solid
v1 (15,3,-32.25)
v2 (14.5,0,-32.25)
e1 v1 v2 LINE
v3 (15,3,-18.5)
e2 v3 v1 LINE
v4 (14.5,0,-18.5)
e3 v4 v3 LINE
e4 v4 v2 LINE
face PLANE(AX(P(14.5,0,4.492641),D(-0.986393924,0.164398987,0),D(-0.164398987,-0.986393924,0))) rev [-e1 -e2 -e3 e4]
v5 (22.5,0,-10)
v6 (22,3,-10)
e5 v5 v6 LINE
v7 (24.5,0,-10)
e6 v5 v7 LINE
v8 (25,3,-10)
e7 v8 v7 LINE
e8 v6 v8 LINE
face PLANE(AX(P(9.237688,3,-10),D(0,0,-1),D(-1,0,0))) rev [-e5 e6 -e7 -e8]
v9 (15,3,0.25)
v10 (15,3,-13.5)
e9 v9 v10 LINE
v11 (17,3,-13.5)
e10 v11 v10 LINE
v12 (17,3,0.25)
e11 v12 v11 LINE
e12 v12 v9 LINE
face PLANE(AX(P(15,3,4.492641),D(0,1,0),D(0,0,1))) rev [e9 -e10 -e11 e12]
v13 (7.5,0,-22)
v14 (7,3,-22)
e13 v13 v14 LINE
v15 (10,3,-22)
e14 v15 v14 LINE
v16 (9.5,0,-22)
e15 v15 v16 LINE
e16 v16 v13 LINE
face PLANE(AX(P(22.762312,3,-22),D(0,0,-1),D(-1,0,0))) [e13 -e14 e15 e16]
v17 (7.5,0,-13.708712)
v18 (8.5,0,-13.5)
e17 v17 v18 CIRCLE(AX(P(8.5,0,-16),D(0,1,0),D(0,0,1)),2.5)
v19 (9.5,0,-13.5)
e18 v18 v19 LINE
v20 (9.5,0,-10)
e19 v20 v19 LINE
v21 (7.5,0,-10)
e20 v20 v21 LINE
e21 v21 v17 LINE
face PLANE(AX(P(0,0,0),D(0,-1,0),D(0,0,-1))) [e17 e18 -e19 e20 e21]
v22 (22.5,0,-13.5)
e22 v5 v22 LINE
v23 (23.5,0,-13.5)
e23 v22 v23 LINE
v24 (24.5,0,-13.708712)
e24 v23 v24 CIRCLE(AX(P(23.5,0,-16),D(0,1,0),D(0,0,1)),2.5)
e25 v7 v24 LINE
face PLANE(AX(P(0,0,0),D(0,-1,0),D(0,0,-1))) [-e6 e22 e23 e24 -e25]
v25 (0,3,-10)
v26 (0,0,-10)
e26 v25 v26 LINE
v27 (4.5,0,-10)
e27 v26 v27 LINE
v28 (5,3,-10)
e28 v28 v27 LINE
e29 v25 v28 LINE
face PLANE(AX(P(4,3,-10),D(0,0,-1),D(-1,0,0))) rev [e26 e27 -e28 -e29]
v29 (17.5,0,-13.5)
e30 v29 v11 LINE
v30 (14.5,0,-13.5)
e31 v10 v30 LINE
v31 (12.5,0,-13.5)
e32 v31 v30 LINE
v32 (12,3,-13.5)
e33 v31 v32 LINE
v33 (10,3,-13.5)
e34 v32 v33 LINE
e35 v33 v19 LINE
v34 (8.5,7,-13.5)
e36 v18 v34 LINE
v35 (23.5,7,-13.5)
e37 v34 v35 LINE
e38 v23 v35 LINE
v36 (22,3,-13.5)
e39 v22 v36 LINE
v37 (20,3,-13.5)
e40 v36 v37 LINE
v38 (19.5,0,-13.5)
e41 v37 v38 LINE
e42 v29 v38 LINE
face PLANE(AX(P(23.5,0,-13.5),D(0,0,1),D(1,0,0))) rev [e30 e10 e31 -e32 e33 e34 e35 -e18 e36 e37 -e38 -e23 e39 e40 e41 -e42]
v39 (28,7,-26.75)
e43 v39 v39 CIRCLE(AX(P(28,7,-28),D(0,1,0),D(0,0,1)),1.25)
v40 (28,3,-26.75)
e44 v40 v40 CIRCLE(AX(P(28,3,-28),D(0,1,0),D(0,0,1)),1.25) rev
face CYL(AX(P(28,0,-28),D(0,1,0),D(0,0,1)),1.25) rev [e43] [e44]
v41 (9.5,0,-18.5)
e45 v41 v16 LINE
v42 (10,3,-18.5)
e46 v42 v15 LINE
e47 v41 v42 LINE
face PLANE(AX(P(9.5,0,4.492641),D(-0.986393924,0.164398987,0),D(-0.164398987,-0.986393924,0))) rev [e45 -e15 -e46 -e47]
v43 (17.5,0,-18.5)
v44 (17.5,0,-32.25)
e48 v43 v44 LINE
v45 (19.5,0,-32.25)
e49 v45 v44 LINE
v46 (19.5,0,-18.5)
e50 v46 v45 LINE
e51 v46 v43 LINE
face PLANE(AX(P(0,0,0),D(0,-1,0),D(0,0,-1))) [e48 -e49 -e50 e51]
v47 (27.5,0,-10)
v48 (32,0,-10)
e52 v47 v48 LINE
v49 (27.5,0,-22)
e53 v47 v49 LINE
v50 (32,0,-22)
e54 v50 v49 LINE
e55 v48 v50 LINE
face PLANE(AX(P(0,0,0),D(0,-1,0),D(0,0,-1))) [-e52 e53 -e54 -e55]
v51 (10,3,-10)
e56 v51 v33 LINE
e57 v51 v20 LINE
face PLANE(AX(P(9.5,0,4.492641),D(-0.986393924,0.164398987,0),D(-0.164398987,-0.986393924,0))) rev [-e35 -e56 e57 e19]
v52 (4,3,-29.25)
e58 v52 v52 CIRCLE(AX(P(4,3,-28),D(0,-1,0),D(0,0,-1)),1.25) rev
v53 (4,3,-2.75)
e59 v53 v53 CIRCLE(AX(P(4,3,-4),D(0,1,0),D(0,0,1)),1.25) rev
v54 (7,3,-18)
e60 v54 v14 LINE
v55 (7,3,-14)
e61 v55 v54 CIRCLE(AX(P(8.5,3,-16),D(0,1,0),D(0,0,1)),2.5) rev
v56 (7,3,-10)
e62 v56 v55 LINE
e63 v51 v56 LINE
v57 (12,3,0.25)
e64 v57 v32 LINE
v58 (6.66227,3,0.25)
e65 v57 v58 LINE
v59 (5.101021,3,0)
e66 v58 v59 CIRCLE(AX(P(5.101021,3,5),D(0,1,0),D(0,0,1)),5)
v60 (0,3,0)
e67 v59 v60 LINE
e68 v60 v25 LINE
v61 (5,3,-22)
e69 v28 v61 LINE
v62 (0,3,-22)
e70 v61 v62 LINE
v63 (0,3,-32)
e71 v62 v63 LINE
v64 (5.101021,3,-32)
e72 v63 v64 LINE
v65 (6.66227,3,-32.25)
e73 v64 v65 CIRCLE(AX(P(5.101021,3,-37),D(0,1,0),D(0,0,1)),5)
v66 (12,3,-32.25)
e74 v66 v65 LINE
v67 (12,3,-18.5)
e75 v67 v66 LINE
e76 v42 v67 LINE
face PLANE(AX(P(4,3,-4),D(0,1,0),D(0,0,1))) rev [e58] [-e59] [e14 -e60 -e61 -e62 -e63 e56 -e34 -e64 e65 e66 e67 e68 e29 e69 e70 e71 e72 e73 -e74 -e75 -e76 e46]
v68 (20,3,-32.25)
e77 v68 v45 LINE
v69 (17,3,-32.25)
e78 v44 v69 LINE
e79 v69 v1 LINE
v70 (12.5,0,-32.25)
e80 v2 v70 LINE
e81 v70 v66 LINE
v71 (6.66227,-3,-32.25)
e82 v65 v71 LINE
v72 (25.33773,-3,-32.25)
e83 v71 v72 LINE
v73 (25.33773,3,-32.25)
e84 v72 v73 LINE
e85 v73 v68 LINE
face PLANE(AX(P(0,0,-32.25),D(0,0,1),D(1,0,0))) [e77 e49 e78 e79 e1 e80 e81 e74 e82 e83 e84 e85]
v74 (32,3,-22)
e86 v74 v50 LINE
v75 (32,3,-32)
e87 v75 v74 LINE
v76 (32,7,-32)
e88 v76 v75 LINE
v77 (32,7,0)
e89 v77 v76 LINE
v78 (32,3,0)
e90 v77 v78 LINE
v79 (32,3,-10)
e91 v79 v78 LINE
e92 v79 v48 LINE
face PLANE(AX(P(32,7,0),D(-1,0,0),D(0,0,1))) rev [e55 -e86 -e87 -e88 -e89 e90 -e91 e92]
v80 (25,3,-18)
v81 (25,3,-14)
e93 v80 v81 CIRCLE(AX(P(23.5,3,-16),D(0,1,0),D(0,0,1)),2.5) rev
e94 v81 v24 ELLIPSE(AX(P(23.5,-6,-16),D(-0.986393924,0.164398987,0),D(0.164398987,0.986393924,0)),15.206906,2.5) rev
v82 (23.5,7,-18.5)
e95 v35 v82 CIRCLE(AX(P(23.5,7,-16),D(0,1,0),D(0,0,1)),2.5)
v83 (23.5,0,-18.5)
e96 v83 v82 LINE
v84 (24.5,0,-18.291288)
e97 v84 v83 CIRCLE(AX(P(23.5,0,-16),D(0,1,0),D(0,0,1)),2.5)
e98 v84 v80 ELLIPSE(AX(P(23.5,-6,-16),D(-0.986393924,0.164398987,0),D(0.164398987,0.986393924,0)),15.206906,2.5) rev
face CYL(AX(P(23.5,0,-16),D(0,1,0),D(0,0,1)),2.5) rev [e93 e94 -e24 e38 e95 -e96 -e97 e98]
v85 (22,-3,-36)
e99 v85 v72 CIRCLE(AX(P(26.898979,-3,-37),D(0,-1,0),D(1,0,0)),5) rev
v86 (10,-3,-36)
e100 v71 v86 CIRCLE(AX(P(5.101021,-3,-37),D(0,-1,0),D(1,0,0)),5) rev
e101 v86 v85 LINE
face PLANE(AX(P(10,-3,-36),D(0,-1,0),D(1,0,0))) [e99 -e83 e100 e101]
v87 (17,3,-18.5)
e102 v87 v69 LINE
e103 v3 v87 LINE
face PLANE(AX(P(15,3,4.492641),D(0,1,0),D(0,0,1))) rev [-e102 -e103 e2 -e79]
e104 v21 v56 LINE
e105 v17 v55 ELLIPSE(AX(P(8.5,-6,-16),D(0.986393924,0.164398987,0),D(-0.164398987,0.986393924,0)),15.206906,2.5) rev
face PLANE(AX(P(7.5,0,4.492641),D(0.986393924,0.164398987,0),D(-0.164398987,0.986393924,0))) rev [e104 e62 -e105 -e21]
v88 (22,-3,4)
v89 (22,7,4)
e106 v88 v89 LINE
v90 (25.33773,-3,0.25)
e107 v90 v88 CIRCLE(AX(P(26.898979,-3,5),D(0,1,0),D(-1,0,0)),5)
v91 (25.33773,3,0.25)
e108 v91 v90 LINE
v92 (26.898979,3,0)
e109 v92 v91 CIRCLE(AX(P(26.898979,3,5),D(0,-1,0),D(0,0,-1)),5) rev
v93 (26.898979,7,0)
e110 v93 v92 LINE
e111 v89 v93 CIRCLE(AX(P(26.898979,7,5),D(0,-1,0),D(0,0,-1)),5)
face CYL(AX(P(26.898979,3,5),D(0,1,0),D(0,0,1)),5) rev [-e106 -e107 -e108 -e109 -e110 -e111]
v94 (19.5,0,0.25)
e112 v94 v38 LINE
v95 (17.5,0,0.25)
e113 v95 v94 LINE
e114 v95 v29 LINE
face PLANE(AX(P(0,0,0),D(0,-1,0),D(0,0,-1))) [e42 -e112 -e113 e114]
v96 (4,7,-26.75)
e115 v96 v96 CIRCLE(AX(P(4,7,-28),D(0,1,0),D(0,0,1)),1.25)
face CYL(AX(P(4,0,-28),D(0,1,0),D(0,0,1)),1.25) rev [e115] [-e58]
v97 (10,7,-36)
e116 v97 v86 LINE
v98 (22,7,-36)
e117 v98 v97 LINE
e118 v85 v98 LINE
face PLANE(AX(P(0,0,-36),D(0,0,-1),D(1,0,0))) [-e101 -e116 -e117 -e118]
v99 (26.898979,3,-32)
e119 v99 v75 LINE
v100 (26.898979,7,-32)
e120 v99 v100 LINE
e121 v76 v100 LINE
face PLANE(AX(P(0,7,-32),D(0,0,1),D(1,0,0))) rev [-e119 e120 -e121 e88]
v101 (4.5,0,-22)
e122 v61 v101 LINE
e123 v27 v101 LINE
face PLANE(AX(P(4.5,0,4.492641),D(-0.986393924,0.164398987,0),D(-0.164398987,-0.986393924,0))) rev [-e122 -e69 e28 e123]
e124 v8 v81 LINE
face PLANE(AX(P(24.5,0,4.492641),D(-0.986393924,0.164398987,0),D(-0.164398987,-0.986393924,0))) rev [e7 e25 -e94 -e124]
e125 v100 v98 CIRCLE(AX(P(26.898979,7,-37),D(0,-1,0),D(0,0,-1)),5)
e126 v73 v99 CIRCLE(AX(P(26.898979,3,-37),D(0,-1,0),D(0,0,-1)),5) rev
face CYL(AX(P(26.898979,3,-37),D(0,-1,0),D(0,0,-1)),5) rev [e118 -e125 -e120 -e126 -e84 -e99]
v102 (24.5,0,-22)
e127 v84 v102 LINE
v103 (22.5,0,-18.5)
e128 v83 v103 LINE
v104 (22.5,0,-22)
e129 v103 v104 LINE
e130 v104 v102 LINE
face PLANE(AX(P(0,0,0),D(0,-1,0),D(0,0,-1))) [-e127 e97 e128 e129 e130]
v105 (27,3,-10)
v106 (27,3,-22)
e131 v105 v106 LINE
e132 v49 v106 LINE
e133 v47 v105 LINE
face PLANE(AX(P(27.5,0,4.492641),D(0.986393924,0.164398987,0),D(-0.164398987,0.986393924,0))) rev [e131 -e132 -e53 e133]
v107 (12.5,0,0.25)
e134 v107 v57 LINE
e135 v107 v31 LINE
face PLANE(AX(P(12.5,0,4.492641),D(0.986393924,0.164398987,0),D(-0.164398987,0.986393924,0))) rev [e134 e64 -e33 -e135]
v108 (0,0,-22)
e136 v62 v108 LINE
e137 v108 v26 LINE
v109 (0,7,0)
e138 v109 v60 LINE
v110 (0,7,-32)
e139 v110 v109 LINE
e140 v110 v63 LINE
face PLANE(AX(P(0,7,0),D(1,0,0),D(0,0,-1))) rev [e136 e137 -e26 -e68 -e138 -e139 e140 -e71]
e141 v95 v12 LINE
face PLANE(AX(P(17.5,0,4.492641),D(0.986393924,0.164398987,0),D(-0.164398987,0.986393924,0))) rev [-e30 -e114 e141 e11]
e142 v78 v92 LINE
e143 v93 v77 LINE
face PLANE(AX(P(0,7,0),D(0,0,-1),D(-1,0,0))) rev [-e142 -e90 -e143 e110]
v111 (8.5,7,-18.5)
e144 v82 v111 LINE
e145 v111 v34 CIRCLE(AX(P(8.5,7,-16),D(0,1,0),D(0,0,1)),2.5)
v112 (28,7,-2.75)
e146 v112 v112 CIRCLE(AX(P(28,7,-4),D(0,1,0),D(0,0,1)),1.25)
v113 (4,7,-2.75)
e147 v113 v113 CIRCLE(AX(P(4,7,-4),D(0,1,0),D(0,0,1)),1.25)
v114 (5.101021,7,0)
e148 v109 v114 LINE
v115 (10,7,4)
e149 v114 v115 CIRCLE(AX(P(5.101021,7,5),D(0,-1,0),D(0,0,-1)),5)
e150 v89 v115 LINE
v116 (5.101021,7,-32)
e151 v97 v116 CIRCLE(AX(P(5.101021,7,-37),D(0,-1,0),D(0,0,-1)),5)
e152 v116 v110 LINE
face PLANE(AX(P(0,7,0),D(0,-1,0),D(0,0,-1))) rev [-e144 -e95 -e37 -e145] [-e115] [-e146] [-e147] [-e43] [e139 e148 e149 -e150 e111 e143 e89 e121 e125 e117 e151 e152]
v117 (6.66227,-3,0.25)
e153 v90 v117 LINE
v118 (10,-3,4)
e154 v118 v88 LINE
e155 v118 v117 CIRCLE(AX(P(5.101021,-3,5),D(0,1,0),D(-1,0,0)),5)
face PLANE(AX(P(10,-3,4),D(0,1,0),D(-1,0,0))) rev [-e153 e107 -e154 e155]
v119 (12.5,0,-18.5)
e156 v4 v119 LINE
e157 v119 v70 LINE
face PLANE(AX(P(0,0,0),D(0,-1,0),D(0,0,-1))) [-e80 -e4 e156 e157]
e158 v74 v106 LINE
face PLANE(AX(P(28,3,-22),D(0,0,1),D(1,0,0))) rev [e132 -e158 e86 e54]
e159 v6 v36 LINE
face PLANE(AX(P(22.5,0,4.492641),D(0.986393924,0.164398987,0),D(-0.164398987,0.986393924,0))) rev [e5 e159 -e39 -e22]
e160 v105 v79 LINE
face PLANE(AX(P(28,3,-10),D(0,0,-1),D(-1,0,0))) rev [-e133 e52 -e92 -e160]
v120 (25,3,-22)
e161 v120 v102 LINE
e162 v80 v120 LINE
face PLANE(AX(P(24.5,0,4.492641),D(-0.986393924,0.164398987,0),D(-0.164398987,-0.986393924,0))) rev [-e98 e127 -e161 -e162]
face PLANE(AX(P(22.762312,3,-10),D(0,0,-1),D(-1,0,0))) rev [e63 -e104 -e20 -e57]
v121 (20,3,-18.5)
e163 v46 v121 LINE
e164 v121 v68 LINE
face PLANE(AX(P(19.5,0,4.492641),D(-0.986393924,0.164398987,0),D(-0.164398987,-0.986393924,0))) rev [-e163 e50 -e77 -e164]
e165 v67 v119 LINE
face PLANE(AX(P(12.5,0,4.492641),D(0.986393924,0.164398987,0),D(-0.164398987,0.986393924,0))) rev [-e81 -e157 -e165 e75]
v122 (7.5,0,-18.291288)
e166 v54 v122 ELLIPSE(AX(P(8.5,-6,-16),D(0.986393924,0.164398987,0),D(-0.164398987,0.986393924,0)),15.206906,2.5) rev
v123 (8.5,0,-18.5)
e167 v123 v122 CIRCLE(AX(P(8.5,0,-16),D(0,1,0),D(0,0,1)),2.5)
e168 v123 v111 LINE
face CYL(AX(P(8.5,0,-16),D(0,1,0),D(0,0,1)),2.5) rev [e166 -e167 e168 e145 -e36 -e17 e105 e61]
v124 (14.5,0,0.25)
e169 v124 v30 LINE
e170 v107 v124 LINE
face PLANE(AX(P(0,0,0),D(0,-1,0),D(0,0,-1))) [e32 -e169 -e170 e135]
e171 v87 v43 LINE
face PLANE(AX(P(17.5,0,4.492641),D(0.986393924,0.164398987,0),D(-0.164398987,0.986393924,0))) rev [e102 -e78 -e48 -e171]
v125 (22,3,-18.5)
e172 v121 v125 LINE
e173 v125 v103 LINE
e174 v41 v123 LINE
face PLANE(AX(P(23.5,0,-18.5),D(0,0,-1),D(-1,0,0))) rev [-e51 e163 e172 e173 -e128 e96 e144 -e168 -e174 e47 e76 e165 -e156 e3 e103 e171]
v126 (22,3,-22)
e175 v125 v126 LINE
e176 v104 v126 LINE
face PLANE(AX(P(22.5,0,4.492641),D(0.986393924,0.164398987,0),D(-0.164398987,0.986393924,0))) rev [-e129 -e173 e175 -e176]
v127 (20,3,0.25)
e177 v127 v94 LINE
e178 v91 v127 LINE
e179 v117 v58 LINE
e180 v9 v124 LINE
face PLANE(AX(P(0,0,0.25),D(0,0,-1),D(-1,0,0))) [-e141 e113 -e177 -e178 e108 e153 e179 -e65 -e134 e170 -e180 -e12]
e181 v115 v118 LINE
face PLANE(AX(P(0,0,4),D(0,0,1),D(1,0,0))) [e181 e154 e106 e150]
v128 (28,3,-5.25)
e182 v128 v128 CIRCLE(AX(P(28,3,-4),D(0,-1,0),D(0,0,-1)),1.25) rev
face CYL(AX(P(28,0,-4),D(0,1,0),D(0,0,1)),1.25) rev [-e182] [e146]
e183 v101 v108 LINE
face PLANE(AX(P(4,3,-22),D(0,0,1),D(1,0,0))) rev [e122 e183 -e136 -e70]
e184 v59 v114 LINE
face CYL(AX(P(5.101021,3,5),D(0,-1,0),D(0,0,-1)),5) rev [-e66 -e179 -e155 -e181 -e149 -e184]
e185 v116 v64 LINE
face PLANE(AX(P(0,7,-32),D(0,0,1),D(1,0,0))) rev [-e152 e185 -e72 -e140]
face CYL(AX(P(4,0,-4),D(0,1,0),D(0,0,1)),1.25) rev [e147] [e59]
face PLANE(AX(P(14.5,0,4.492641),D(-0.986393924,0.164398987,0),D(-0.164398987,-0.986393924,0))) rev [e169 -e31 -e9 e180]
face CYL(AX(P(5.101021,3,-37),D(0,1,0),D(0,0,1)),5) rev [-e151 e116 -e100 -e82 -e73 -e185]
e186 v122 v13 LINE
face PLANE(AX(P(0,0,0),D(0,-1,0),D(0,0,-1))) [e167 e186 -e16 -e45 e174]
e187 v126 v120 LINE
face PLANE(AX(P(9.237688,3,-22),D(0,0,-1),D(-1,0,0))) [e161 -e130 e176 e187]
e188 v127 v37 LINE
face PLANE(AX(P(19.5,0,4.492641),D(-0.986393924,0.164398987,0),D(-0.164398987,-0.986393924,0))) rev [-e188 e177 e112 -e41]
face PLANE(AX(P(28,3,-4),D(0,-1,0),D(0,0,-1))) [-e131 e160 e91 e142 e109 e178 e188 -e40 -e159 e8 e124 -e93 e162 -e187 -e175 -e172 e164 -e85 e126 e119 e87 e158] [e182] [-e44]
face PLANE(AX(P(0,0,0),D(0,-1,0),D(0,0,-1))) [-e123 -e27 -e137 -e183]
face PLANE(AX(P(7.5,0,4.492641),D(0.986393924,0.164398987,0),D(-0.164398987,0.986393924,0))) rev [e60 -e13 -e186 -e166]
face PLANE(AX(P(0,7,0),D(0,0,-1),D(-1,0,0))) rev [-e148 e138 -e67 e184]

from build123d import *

# Parameters (mm, degrees)
SKETCH_1_W                      = 32
SKETCH_1_H                      = 32
EXTRUDE_1_DEPTH                 = 7
SKETCH_3_R                      = 1.25
CUT_EXTRUDE_1_DEPTH             = 46.793012567
CUT_EXTRUDE_2_DEPTH             = 3
CUT_EXTRUDE_3_DEPTH             = 46.793012567
SKETCH_6_W                      = 12
SKETCH_6_H                      = 10
EXTRUDE_2_DEPTH                 = 4
SKETCH_11_W                     = 12
SKETCH_11_H                     = 3
CUT_EXTRUDE_5_DEPTH             = 0.25
SKETCH_12_W                     = 12
SKETCH_12_H                     = 3
CUT_EXTRUDE_6_DEPTH             = 0.25
CUT_EXTRUDE_7_REACH             = 40.38
CUT_EXTRUDE_7_DIRECTION_2_REACH = 40.38
FILLET_1_R                      = 5
FILLET_2_R                      = 5
CUT_EXTRUDE_8_REACH             = 50.672
SKETCH_13_W                     = 10
SKETCH_13_H                     = 3
CUT_EXTRUDE_9_REACH             = 50.672
SKETCH_14_W                     = 10
SKETCH_14_H                     = 3


with BuildPart() as part:
    # Эскиз1 → Бобышка-Вытянуть1 (new body)
    with BuildSketch(Plane(origin=(0, 0, 0), x_dir=(1, 0, 0), z_dir=(0, 1, 0))):
        with Locations((16, 16)):
            Rectangle(SKETCH_1_W, SKETCH_1_H)
    extrude(amount=EXTRUDE_1_DEPTH)

    # Эскиз3 → Вырез-Вытянуть1 (cut, through all)
    with BuildSketch(Plane(origin=(0, 7, 0), x_dir=(1, 0, 0), z_dir=(0, 1, 0))):
        with Locations(Location((4, 28, 0), (0, 0, 270))):
            Circle(SKETCH_3_R)
        with Locations(Location((28, 28, 0), (0, 0, 270))):
            Circle(SKETCH_3_R)
        with Locations(Location((4, 4, 0), (0, 0, 270))):
            Circle(SKETCH_3_R)
        with Locations(Location((28, 4, 0), (0, 0, 270))):
            Circle(SKETCH_3_R)
    extrude(amount=-CUT_EXTRUDE_1_DEPTH, mode=Mode.SUBTRACT)

    # Эскиз4 → Вырез-Вытянуть2 (cut)
    with BuildSketch(Plane.XZ):
        with BuildLine():
            Line((28, -10), (32, -10))
            Line((32, -10), (32, 0))
            Line((32, 0), (22, 0))
            Line((22, 0), (22, -4))
            ThreePointArc((22, -4), (23.757359313, -8.242640687), (28, -10))
        make_face()
        with BuildLine():
            Line((4, -10), (0, -10))
            Line((0, -10), (0, 0))
            Line((0, 0), (10, 0))
            Line((10, 0), (10, -4))
            ThreePointArc((10, -4), (8.242640687, -8.242640687), (4, -10))
        make_face()
        with BuildLine():
            Line((22, -32), (32, -32))
            Line((32, -32), (32, -22))
            Line((32, -22), (28, -22))
            ThreePointArc((28, -22), (23.757359313, -23.757359313), (22, -28))
            Line((22, -28), (22, -32))
        make_face()
        with BuildLine():
            Line((10, -32), (0, -32))
            Line((0, -32), (0, -22))
            Line((0, -22), (4, -22))
            ThreePointArc((4, -22), (8.242640687, -23.757359313), (10, -28))
            Line((10, -28), (10, -32))
        make_face()
    extrude(amount=-CUT_EXTRUDE_2_DEPTH, mode=Mode.SUBTRACT)

    # Эскиз5 → Вырез-Вытянуть3 (cut, through all)
    with BuildSketch(Plane(origin=(0, 7, 0), x_dir=(1, 0, 0), z_dir=(0, 1, 0))):
        with BuildLine():
            Line((23.5, 18.5), (8.5, 18.5))
            ThreePointArc((8.5, 18.5), (6, 16), (8.5, 13.5))
            Line((8.5, 13.5), (23.5, 13.5))
            ThreePointArc((23.5, 13.5), (26, 16), (23.5, 18.5))
        make_face()
    extrude(amount=-CUT_EXTRUDE_3_DEPTH, mode=Mode.SUBTRACT)

    # Эскиз6 → Бобышка-Вытянуть2 (add)
    with BuildSketch(Plane.XY):
        with Locations((16, 2)):
            Rectangle(SKETCH_6_W, SKETCH_6_H)
    extrude_2 = extrude(amount=EXTRUDE_2_DEPTH)

    # Зеркальное отражение1: Бобышка-Вытянуть2 across plane
    add(extrude_2.mirror(Plane(origin=(0, 0, -16), x_dir=(1, 0, 0), z_dir=(0, 0, -1))))

    # Эскиз11 → Вырез-Вытянуть5 (cut)
    with BuildSketch(Plane(origin=(0, 0, 0), x_dir=(-1, 0, 0), z_dir=(0, 0, -1))):
        with Locations((-16, -1.5)):
            Rectangle(SKETCH_11_W, SKETCH_11_H)
    extrude(amount=-CUT_EXTRUDE_5_DEPTH, mode=Mode.SUBTRACT)

    # Эскиз12 → Вырез-Вытянуть6 (cut)
    with BuildSketch(Plane.XY.offset(-32)):
        with Locations((16, -1.5)):
            Rectangle(SKETCH_12_W, SKETCH_12_H)
    extrude(amount=-CUT_EXTRUDE_6_DEPTH, mode=Mode.SUBTRACT)

    # Вырез-Вытянуть7: up to this face of the body (flat: up to its plane)
    cut_extrude_7_end = Plane(part.part.faces().sort_by_distance((16, -1.5, 0.25))[0])
    # Эскиз10 → Вырез-Вытянуть7 (cut, up to the picked face)
    with BuildSketch(Plane(origin=(0, 0, -16), x_dir=(-1, 0, 0), z_dir=(0, 0, -1)), mode=Mode.PRIVATE) as cut_extrude_7_sk1:
        Polygon((-14.5, 0), (-15, 3), (-17, 3), (-17.5, 0), align=None)
    cut_extrude_7_tool1 = split(extrude(cut_extrude_7_sk1.sketch, amount=-CUT_EXTRUDE_7_REACH, mode=Mode.PRIVATE), bisect_by=cut_extrude_7_end, keep=Keep.BOTH, mode=Mode.PRIVATE)
    # Эскиз10 → Вырез-Вытянуть7 (cut, up to the picked face)
    with BuildSketch(Plane(origin=(0, 0, -16), x_dir=(-1, 0, 0), z_dir=(0, 0, -1)), mode=Mode.PRIVATE) as cut_extrude_7_sk2:
        Polygon((-9.5, 0), (-10, 3), (-12, 3), (-12.5, 0), align=None)
    cut_extrude_7_tool2 = split(extrude(cut_extrude_7_sk2.sketch, amount=-CUT_EXTRUDE_7_REACH, mode=Mode.PRIVATE), bisect_by=cut_extrude_7_end, keep=Keep.BOTH, mode=Mode.PRIVATE)
    # Эскиз10 → Вырез-Вытянуть7 (cut, up to the picked face)
    with BuildSketch(Plane(origin=(0, 0, -16), x_dir=(-1, 0, 0), z_dir=(0, 0, -1)), mode=Mode.PRIVATE) as cut_extrude_7_sk3:
        Polygon((-4.5, 0), (-5, 3), (-7, 3), (-7.5, 0), align=None)
    cut_extrude_7_tool3 = split(extrude(cut_extrude_7_sk3.sketch, amount=-CUT_EXTRUDE_7_REACH, mode=Mode.PRIVATE), bisect_by=cut_extrude_7_end, keep=Keep.BOTH, mode=Mode.PRIVATE)
    # Эскиз10 → Вырез-Вытянуть7 (cut, up to the picked face)
    with BuildSketch(Plane(origin=(0, 0, -16), x_dir=(-1, 0, 0), z_dir=(0, 0, -1)), mode=Mode.PRIVATE) as cut_extrude_7_sk4:
        Polygon((-22.5, 0), (-22, 3), (-20, 3), (-19.5, 0), align=None)
    cut_extrude_7_tool4 = split(extrude(cut_extrude_7_sk4.sketch, amount=-CUT_EXTRUDE_7_REACH, mode=Mode.PRIVATE), bisect_by=cut_extrude_7_end, keep=Keep.BOTH, mode=Mode.PRIVATE)
    # Эскиз10 → Вырез-Вытянуть7 (cut, up to the picked face)
    with BuildSketch(Plane(origin=(0, 0, -16), x_dir=(-1, 0, 0), z_dir=(0, 0, -1)), mode=Mode.PRIVATE) as cut_extrude_7_sk5:
        Polygon((-27.5, 0), (-27, 3), (-25, 3), (-24.5, 0), align=None)
    cut_extrude_7_tool5 = split(extrude(cut_extrude_7_sk5.sketch, amount=-CUT_EXTRUDE_7_REACH, mode=Mode.PRIVATE), bisect_by=cut_extrude_7_end, keep=Keep.BOTH, mode=Mode.PRIVATE)
    add(cut_extrude_7_tool1.solids().sort_by(Axis((16, 1.4, -16), (0, 0, 1)))[0], mode=Mode.SUBTRACT)
    add(cut_extrude_7_tool2.solids().sort_by(Axis((11, 1.4, -16), (0, 0, 1)))[0], mode=Mode.SUBTRACT)
    add(cut_extrude_7_tool3.solids().sort_by(Axis((6, 1.4, -16), (0, 0, 1)))[0], mode=Mode.SUBTRACT)
    add(cut_extrude_7_tool4.solids().sort_by(Axis((21, 1.4, -16), (0, 0, 1)))[0], mode=Mode.SUBTRACT)
    add(cut_extrude_7_tool5.solids().sort_by(Axis((26, 1.4, -16), (0, 0, 1)))[0], mode=Mode.SUBTRACT)

    # Вырез-Вытянуть7 direction 2: up to this face of the body (flat: up to its plane)
    cut_extrude_7_direction_2_end = Plane(part.part.faces().sort_by_distance((16, -1.5, -32.25))[0])
    # Эскиз10 → Вырез-Вытянуть7 direction 2 (cut, up to the picked face)
    with BuildSketch(Plane(origin=(0, 0, -16), x_dir=(-1, 0, 0), z_dir=(0, 0, -1)), mode=Mode.PRIVATE) as cut_extrude_7_direction_2_sk1:
        Polygon((-14.5, 0), (-15, 3), (-17, 3), (-17.5, 0), align=None)
    cut_extrude_7_direction_2_tool1 = split(extrude(cut_extrude_7_direction_2_sk1.sketch, amount=CUT_EXTRUDE_7_DIRECTION_2_REACH, mode=Mode.PRIVATE), bisect_by=cut_extrude_7_direction_2_end, keep=Keep.BOTH, mode=Mode.PRIVATE)
    # Эскиз10 → Вырез-Вытянуть7 direction 2 (cut, up to the picked face)
    with BuildSketch(Plane(origin=(0, 0, -16), x_dir=(-1, 0, 0), z_dir=(0, 0, -1)), mode=Mode.PRIVATE) as cut_extrude_7_direction_2_sk2:
        Polygon((-9.5, 0), (-10, 3), (-12, 3), (-12.5, 0), align=None)
    cut_extrude_7_direction_2_tool2 = split(extrude(cut_extrude_7_direction_2_sk2.sketch, amount=CUT_EXTRUDE_7_DIRECTION_2_REACH, mode=Mode.PRIVATE), bisect_by=cut_extrude_7_direction_2_end, keep=Keep.BOTH, mode=Mode.PRIVATE)
    # Эскиз10 → Вырез-Вытянуть7 direction 2 (cut, up to the picked face)
    with BuildSketch(Plane(origin=(0, 0, -16), x_dir=(-1, 0, 0), z_dir=(0, 0, -1)), mode=Mode.PRIVATE) as cut_extrude_7_direction_2_sk3:
        Polygon((-4.5, 0), (-5, 3), (-7, 3), (-7.5, 0), align=None)
    cut_extrude_7_direction_2_tool3 = split(extrude(cut_extrude_7_direction_2_sk3.sketch, amount=CUT_EXTRUDE_7_DIRECTION_2_REACH, mode=Mode.PRIVATE), bisect_by=cut_extrude_7_direction_2_end, keep=Keep.BOTH, mode=Mode.PRIVATE)
    # Эскиз10 → Вырез-Вытянуть7 direction 2 (cut, up to the picked face)
    with BuildSketch(Plane(origin=(0, 0, -16), x_dir=(-1, 0, 0), z_dir=(0, 0, -1)), mode=Mode.PRIVATE) as cut_extrude_7_direction_2_sk4:
        Polygon((-22.5, 0), (-22, 3), (-20, 3), (-19.5, 0), align=None)
    cut_extrude_7_direction_2_tool4 = split(extrude(cut_extrude_7_direction_2_sk4.sketch, amount=CUT_EXTRUDE_7_DIRECTION_2_REACH, mode=Mode.PRIVATE), bisect_by=cut_extrude_7_direction_2_end, keep=Keep.BOTH, mode=Mode.PRIVATE)
    # Эскиз10 → Вырез-Вытянуть7 direction 2 (cut, up to the picked face)
    with BuildSketch(Plane(origin=(0, 0, -16), x_dir=(-1, 0, 0), z_dir=(0, 0, -1)), mode=Mode.PRIVATE) as cut_extrude_7_direction_2_sk5:
        Polygon((-27.5, 0), (-27, 3), (-25, 3), (-24.5, 0), align=None)
    cut_extrude_7_direction_2_tool5 = split(extrude(cut_extrude_7_direction_2_sk5.sketch, amount=CUT_EXTRUDE_7_DIRECTION_2_REACH, mode=Mode.PRIVATE), bisect_by=cut_extrude_7_direction_2_end, keep=Keep.BOTH, mode=Mode.PRIVATE)
    add(cut_extrude_7_direction_2_tool1.solids().sort_by(Axis((16, 1.4, -16), (0, 0, -1)))[0], mode=Mode.SUBTRACT)
    add(cut_extrude_7_direction_2_tool2.solids().sort_by(Axis((11, 1.4, -16), (0, 0, -1)))[0], mode=Mode.SUBTRACT)
    add(cut_extrude_7_direction_2_tool3.solids().sort_by(Axis((6, 1.4, -16), (0, 0, -1)))[0], mode=Mode.SUBTRACT)
    add(cut_extrude_7_direction_2_tool4.solids().sort_by(Axis((21, 1.4, -16), (0, 0, -1)))[0], mode=Mode.SUBTRACT)
    add(cut_extrude_7_direction_2_tool5.solids().sort_by(Axis((26, 1.4, -16), (0, 0, -1)))[0], mode=Mode.SUBTRACT)

    # Скругление1
    # the kernel refuses this fillet: 5 mm, written as the material it adds along each edge
    with BuildSketch(Plane(origin=(10, -9.247448714, 0), x_dir=(-1, 0, 0), z_dir=(0, 1, 0))) as fillet_1_piece_1_section:
        with BuildLine():
            CenterArc((4.898979486, 5), FILLET_1_R, 191.536959033, 78.463040967)
            Line((0, 4), (-0.09797959, 3.98))
            ThreePointArc((-0.09797959, 3.98), (-0.1, 2), (-0.1, 0))
            Line((-0.1, 0), (0, -0.1))
            Line((0, -0.1), (4.898979486, -0.1))
            Line((4.898979486, -0.1), (4.898979486, 0))
        make_face()
    fillet_1_piece_1 = extrude(amount=16.247448714, mode=Mode.PRIVATE)
    fillet_1_piece_1 = split(fillet_1_piece_1, bisect_by=Plane(origin=(9.174108799, 3, 1.317726135), z_dir=(0, -1, 0)), keep=Keep.TOP, mode=Mode.PRIVATE)
    fillet_1_piece_1 = split(fillet_1_piece_1, bisect_by=Plane(origin=(9.174108799, 0, 0.25), z_dir=(0, 0, 1)), keep=Keep.TOP, mode=Mode.PRIVATE)
    fillet_1_piece_1 = split(fillet_1_piece_1, bisect_by=Plane(origin=(9.174108799, -3, 1.317726135), z_dir=(0, 1, 0)), keep=Keep.TOP, mode=Mode.PRIVATE)
    add(fillet_1_piece_1)
    with BuildSketch(Plane(origin=(10, 3, 0), x_dir=(-1, 0, 0), z_dir=(0, 1, 0))) as fillet_1_piece_2_section:
        with BuildLine():
            CenterArc((4.898979486, 5), FILLET_1_R, 191.536959033, 78.463040967)
            Line((0, 4), (-0.09797959, 3.98))
            ThreePointArc((-0.09797959, 3.98), (-0.1, 2), (-0.1, 0))
            Line((-0.1, 0), (0, -0.1))
            Line((0, -0.1), (4.898979486, -0.1))
            Line((4.898979486, -0.1), (4.898979486, 0))
        make_face()
    fillet_1_piece_2 = extrude(amount=4, mode=Mode.PRIVATE)
    fillet_1_piece_2 = split(fillet_1_piece_2, bisect_by=Plane(origin=(7.929392112, 5, 0.25), z_dir=(0, 0, -1)), keep=Keep.TOP, mode=Mode.PRIVATE)
    add(fillet_1_piece_2)
    with BuildSketch(Plane(origin=(10, 3, 0), x_dir=(-1, 0, 0), z_dir=(0, 1, 0))) as fillet_1_piece_3_section:
        with BuildLine():
            CenterArc((4.898979486, 5), FILLET_1_R, 191.536959033, 78.463040967)
            Line((0, 4), (-0.09797959, 3.98))
            ThreePointArc((-0.09797959, 3.98), (-0.1, 2), (-0.1, 0))
            Line((-0.1, 0), (0, -0.1))
            Line((0, -0.1), (4.898979486, -0.1))
            Line((4.898979486, -0.1), (4.898979486, 0))
        make_face()
    fillet_1_piece_3 = extrude(amount=4, mode=Mode.PRIVATE)
    fillet_1_piece_3 = split(fillet_1_piece_3, bisect_by=Plane(origin=(9.174108799, 5, 0.25), z_dir=(0, 0, 1)), keep=Keep.TOP, mode=Mode.PRIVATE)
    add(fillet_1_piece_3)

    # Скругление2
    # the kernel refuses this fillet: 5 mm, written as the material it adds along each edge
    with BuildSketch(Plane(origin=(10, -9.247448714, -32), x_dir=(-1.5738521597081158e-12, 0, -1.0), z_dir=(0, 1, 0))) as fillet_2_piece_1_section:
        with BuildLine():
            CenterArc((5, 4.898979486), FILLET_2_R, 180, 78.463040967)
            Line((0, 4.898979486), (-0.1, 4.898979486))
            Line((-0.1, 4.898979486), (-0.1, 0))
            Line((-0.1, 0), (0, -0.1))
            ThreePointArc((0, -0.1), (2, -0.1), (3.98, -0.09797959))
            Line((3.98, -0.09797959), (4, 0))
        make_face()
    fillet_2_piece_1 = extrude(amount=16.247448714, mode=Mode.PRIVATE)
    fillet_2_piece_1 = split(fillet_2_piece_1, bisect_by=Plane(origin=(9.174108799, 0, -32.25), z_dir=(0, 0, -1)), keep=Keep.TOP, mode=Mode.PRIVATE)
    fillet_2_piece_1 = split(fillet_2_piece_1, bisect_by=Plane(origin=(9.174108799, 3, -33.317726135), z_dir=(0, -1, 0)), keep=Keep.TOP, mode=Mode.PRIVATE)
    fillet_2_piece_1 = split(fillet_2_piece_1, bisect_by=Plane(origin=(9.174108799, -3, -33.317726135), z_dir=(0, 1, 0)), keep=Keep.TOP, mode=Mode.PRIVATE)
    add(fillet_2_piece_1)
    with BuildSketch(Plane(origin=(10, 3, -32), x_dir=(-1.5720758028687162e-12, 0, -1.0), z_dir=(0, 1, 0))) as fillet_2_piece_2_section:
        with BuildLine():
            CenterArc((5, 4.898979486), FILLET_2_R, 180, 78.463040967)
            Line((0, 4.898979486), (-0.1, 4.898979486))
            Line((-0.1, 4.898979486), (-0.1, 0))
            Line((-0.1, 0), (0, -0.1))
            ThreePointArc((0, -0.1), (2, -0.1), (3.98, -0.09797959))
            Line((3.98, -0.09797959), (4, 0))
        make_face()
    fillet_2_piece_2 = extrude(amount=4, mode=Mode.PRIVATE)
    fillet_2_piece_2 = split(fillet_2_piece_2, bisect_by=Plane(origin=(9.174108799, 5, -32.25), z_dir=(0, 0, -1)), keep=Keep.TOP, mode=Mode.PRIVATE)
    add(fillet_2_piece_2)
    with BuildSketch(Plane(origin=(10, 3, -32), x_dir=(-1.5720758028687162e-12, 0, -1.0), z_dir=(0, 1, 0))) as fillet_2_piece_3_section:
        with BuildLine():
            CenterArc((5, 4.898979486), FILLET_2_R, 180, 78.463040967)
            Line((0, 4.898979486), (-0.1, 4.898979486))
            Line((-0.1, 4.898979486), (-0.1, 0))
            Line((-0.1, 0), (0, -0.1))
            ThreePointArc((0, -0.1), (2, -0.1), (3.98, -0.09797959))
            Line((3.98, -0.09797959), (4, 0))
        make_face()
    fillet_2_piece_3 = extrude(amount=4, mode=Mode.PRIVATE)
    fillet_2_piece_3 = split(fillet_2_piece_3, bisect_by=Plane(origin=(7.929392112, 5, -32.25), z_dir=(0, 0, 1)), keep=Keep.TOP, mode=Mode.PRIVATE)
    add(fillet_2_piece_3)
    with BuildSketch(Plane(origin=(22, 7, -32), x_dir=(1, 0, 0), z_dir=(0, -1, 0))) as fillet_2_piece_4_section:
        with BuildLine():
            CenterArc((4.898979486, -5), FILLET_2_R, 90, 78.463040967)
            Line((0, -4), (-0.09797959, -3.98))
            ThreePointArc((-0.09797959, -3.98), (-0.1, -2), (-0.1, 0))
            Line((-0.1, 0), (0, 0.1))
            Line((0, 0.1), (4.898979486, 0.1))
            Line((4.898979486, 0.1), (4.898979486, 0))
        make_face()
    fillet_2_piece_4 = extrude(amount=4, mode=Mode.PRIVATE)
    fillet_2_piece_4 = split(fillet_2_piece_4, bisect_by=Plane(origin=(24.070607888, 5, -32.25), z_dir=(0, 0, 1)), keep=Keep.TOP, mode=Mode.PRIVATE)
    add(fillet_2_piece_4)
    with BuildSketch(Plane(origin=(22, 7, -32), x_dir=(1, 0, 0), z_dir=(0, -1, 0))) as fillet_2_piece_5_section:
        with BuildLine():
            CenterArc((4.898979486, -5), FILLET_2_R, 90, 78.463040967)
            Line((0, -4), (-0.09797959, -3.98))
            ThreePointArc((-0.09797959, -3.98), (-0.1, -2), (-0.1, 0))
            Line((-0.1, 0), (0, 0.1))
            Line((0, 0.1), (4.898979486, 0.1))
            Line((4.898979486, 0.1), (4.898979486, 0))
        make_face()
    fillet_2_piece_5 = extrude(amount=4, mode=Mode.PRIVATE)
    fillet_2_piece_5 = split(fillet_2_piece_5, bisect_by=Plane(origin=(22.825891201, 5, -32.25), z_dir=(0, 0, -1)), keep=Keep.TOP, mode=Mode.PRIVATE)
    add(fillet_2_piece_5)
    with BuildSketch(Plane(origin=(22, 7, -32), x_dir=(1, 0, 0), z_dir=(0, -1, 0))) as fillet_2_piece_6_section:
        with BuildLine():
            CenterArc((4.898979486, -5), FILLET_2_R, 90, 78.463040967)
            Line((0, -4), (-0.09797959, -3.98))
            ThreePointArc((-0.09797959, -3.98), (-0.1, -2), (-0.1, 0))
            Line((-0.1, 0), (0, 0.1))
            Line((0, 0.1), (4.898979486, 0.1))
            Line((4.898979486, 0.1), (4.898979486, 0))
        make_face()
    fillet_2_piece_6 = extrude(amount=16.247448714, mode=Mode.PRIVATE)
    fillet_2_piece_6 = split(fillet_2_piece_6, bisect_by=Plane(origin=(22.825891201, 3, -33.317726135), z_dir=(0, -1, 0)), keep=Keep.TOP, mode=Mode.PRIVATE)
    fillet_2_piece_6 = split(fillet_2_piece_6, bisect_by=Plane(origin=(22.825891201, -3, -33.317726135), z_dir=(0, 1, 0)), keep=Keep.TOP, mode=Mode.PRIVATE)
    fillet_2_piece_6 = split(fillet_2_piece_6, bisect_by=Plane(origin=(22.825891201, 0, -32.25), z_dir=(0, 0, -1)), keep=Keep.TOP, mode=Mode.PRIVATE)
    add(fillet_2_piece_6)
    with BuildSketch(Plane(origin=(22, 7, 0), x_dir=(1.572075802868717e-12, 0, 1.0), z_dir=(0, -1, 0))) as fillet_2_piece_7_section:
        with BuildLine():
            CenterArc((5, -4.898979486), FILLET_2_R, 101.536959033, 78.463040967)
            Line((0, -4.898979486), (-0.1, -4.898979486))
            Line((-0.1, -4.898979486), (-0.1, 0))
            Line((-0.1, 0), (0, 0.1))
            ThreePointArc((0, 0.1), (2, 0.1), (3.98, 0.09797959))
            Line((3.98, 0.09797959), (4, 0))
        make_face()
    fillet_2_piece_7 = extrude(amount=4, mode=Mode.PRIVATE)
    fillet_2_piece_7 = split(fillet_2_piece_7, bisect_by=Plane(origin=(22.825891201, 5, 0.25), z_dir=(0, 0, 1)), keep=Keep.TOP, mode=Mode.PRIVATE)
    add(fillet_2_piece_7)
    with BuildSketch(Plane(origin=(22, 7, 0), x_dir=(1.572075802868717e-12, 0, 1.0), z_dir=(0, -1, 0))) as fillet_2_piece_8_section:
        with BuildLine():
            CenterArc((5, -4.898979486), FILLET_2_R, 101.536959033, 78.463040967)
            Line((0, -4.898979486), (-0.1, -4.898979486))
            Line((-0.1, -4.898979486), (-0.1, 0))
            Line((-0.1, 0), (0, 0.1))
            ThreePointArc((0, 0.1), (2, 0.1), (3.98, 0.09797959))
            Line((3.98, 0.09797959), (4, 0))
        make_face()
    fillet_2_piece_8 = extrude(amount=4, mode=Mode.PRIVATE)
    fillet_2_piece_8 = split(fillet_2_piece_8, bisect_by=Plane(origin=(24.070607888, 5, 0.25), z_dir=(0, 0, -1)), keep=Keep.TOP, mode=Mode.PRIVATE)
    add(fillet_2_piece_8)
    with BuildSketch(Plane(origin=(22, 7, 0), x_dir=(1.572075802868717e-12, 0, 1.0), z_dir=(0, -1, 0))) as fillet_2_piece_9_section:
        with BuildLine():
            CenterArc((5, -4.898979486), FILLET_2_R, 101.536959033, 78.463040967)
            Line((0, -4.898979486), (-0.1, -4.898979486))
            Line((-0.1, -4.898979486), (-0.1, 0))
            Line((-0.1, 0), (0, 0.1))
            ThreePointArc((0, 0.1), (2, 0.1), (3.98, 0.09797959))
            Line((3.98, 0.09797959), (4, 0))
        make_face()
    fillet_2_piece_9 = extrude(amount=16.247448714, mode=Mode.PRIVATE)
    fillet_2_piece_9 = split(fillet_2_piece_9, bisect_by=Plane(origin=(22.825891201, -3, 1.317726135), z_dir=(0, 1, 0)), keep=Keep.TOP, mode=Mode.PRIVATE)
    fillet_2_piece_9 = split(fillet_2_piece_9, bisect_by=Plane(origin=(22.825891201, 0, 0.25), z_dir=(0, 0, 1)), keep=Keep.TOP, mode=Mode.PRIVATE)
    fillet_2_piece_9 = split(fillet_2_piece_9, bisect_by=Plane(origin=(22.825891201, 3, 1.317726135), z_dir=(0, -1, 0)), keep=Keep.TOP, mode=Mode.PRIVATE)
    add(fillet_2_piece_9)

    # Вырез-Вытянуть8: up to this face of the body (flat: up to its plane)
    cut_extrude_8_end = Plane(part.part.faces().sort_by_distance((12.25, 1.5, -6.625))[0])
    # Эскиз13 → Вырез-Вытянуть8 (cut, up to the picked face)
    with BuildSketch(Plane.ZY, mode=Mode.PRIVATE) as cut_extrude_8_sk1:
        with Locations((-5, 1.5)):
            Rectangle(SKETCH_13_W, SKETCH_13_H)
    cut_extrude_8_tool1 = split(extrude(cut_extrude_8_sk1.sketch, amount=-CUT_EXTRUDE_8_REACH, mode=Mode.PRIVATE), bisect_by=cut_extrude_8_end, keep=Keep.BOTH, mode=Mode.PRIVATE)
    cut_extrude_8 = cut_extrude_8_tool1.solids().sort_by(Axis((0, 1.5, -5), (1, 0, 0)))[0]
    add(cut_extrude_8, mode=Mode.SUBTRACT)

    # Вырез-Вытянуть9: up to this plane
    cut_extrude_9_end = Plane(origin=(22.5, 0, 4.492640687), z_dir=(0.9863939238321437, 0.16439898730535746, 0))
    # Эскиз14 → Вырез-Вытянуть9 (cut, up to the surface)
    with BuildSketch(Plane(origin=(32, 0, 0), x_dir=(0, 0, -1), z_dir=(1, 0, 0)), mode=Mode.PRIVATE) as cut_extrude_9_sk1:
        with Locations((5, 1.5)):
            Rectangle(SKETCH_14_W, SKETCH_14_H)
    cut_extrude_9_tool1 = split(extrude(cut_extrude_9_sk1.sketch, amount=-CUT_EXTRUDE_9_REACH, mode=Mode.PRIVATE), bisect_by=cut_extrude_9_end, keep=Keep.BOTH, mode=Mode.PRIVATE)
    cut_extrude_9 = cut_extrude_9_tool1.solids().sort_by_distance((32, 1.5, -5))[0]
    add(cut_extrude_9, mode=Mode.SUBTRACT)

    # Зеркальное отражение2: Вырез-Вытянуть8, Вырез-Вытянуть9 across plane
    add(cut_extrude_8.mirror(Plane(origin=(0, 0, -16), x_dir=(1, 0, 0), z_dir=(0, 0, -1))), mode=Mode.SUBTRACT)
    add(cut_extrude_9.mirror(Plane(origin=(0, 0, -16), x_dir=(1, 0, 0), z_dir=(0, 0, -1))), mode=Mode.SUBTRACT)


solid = part.part
